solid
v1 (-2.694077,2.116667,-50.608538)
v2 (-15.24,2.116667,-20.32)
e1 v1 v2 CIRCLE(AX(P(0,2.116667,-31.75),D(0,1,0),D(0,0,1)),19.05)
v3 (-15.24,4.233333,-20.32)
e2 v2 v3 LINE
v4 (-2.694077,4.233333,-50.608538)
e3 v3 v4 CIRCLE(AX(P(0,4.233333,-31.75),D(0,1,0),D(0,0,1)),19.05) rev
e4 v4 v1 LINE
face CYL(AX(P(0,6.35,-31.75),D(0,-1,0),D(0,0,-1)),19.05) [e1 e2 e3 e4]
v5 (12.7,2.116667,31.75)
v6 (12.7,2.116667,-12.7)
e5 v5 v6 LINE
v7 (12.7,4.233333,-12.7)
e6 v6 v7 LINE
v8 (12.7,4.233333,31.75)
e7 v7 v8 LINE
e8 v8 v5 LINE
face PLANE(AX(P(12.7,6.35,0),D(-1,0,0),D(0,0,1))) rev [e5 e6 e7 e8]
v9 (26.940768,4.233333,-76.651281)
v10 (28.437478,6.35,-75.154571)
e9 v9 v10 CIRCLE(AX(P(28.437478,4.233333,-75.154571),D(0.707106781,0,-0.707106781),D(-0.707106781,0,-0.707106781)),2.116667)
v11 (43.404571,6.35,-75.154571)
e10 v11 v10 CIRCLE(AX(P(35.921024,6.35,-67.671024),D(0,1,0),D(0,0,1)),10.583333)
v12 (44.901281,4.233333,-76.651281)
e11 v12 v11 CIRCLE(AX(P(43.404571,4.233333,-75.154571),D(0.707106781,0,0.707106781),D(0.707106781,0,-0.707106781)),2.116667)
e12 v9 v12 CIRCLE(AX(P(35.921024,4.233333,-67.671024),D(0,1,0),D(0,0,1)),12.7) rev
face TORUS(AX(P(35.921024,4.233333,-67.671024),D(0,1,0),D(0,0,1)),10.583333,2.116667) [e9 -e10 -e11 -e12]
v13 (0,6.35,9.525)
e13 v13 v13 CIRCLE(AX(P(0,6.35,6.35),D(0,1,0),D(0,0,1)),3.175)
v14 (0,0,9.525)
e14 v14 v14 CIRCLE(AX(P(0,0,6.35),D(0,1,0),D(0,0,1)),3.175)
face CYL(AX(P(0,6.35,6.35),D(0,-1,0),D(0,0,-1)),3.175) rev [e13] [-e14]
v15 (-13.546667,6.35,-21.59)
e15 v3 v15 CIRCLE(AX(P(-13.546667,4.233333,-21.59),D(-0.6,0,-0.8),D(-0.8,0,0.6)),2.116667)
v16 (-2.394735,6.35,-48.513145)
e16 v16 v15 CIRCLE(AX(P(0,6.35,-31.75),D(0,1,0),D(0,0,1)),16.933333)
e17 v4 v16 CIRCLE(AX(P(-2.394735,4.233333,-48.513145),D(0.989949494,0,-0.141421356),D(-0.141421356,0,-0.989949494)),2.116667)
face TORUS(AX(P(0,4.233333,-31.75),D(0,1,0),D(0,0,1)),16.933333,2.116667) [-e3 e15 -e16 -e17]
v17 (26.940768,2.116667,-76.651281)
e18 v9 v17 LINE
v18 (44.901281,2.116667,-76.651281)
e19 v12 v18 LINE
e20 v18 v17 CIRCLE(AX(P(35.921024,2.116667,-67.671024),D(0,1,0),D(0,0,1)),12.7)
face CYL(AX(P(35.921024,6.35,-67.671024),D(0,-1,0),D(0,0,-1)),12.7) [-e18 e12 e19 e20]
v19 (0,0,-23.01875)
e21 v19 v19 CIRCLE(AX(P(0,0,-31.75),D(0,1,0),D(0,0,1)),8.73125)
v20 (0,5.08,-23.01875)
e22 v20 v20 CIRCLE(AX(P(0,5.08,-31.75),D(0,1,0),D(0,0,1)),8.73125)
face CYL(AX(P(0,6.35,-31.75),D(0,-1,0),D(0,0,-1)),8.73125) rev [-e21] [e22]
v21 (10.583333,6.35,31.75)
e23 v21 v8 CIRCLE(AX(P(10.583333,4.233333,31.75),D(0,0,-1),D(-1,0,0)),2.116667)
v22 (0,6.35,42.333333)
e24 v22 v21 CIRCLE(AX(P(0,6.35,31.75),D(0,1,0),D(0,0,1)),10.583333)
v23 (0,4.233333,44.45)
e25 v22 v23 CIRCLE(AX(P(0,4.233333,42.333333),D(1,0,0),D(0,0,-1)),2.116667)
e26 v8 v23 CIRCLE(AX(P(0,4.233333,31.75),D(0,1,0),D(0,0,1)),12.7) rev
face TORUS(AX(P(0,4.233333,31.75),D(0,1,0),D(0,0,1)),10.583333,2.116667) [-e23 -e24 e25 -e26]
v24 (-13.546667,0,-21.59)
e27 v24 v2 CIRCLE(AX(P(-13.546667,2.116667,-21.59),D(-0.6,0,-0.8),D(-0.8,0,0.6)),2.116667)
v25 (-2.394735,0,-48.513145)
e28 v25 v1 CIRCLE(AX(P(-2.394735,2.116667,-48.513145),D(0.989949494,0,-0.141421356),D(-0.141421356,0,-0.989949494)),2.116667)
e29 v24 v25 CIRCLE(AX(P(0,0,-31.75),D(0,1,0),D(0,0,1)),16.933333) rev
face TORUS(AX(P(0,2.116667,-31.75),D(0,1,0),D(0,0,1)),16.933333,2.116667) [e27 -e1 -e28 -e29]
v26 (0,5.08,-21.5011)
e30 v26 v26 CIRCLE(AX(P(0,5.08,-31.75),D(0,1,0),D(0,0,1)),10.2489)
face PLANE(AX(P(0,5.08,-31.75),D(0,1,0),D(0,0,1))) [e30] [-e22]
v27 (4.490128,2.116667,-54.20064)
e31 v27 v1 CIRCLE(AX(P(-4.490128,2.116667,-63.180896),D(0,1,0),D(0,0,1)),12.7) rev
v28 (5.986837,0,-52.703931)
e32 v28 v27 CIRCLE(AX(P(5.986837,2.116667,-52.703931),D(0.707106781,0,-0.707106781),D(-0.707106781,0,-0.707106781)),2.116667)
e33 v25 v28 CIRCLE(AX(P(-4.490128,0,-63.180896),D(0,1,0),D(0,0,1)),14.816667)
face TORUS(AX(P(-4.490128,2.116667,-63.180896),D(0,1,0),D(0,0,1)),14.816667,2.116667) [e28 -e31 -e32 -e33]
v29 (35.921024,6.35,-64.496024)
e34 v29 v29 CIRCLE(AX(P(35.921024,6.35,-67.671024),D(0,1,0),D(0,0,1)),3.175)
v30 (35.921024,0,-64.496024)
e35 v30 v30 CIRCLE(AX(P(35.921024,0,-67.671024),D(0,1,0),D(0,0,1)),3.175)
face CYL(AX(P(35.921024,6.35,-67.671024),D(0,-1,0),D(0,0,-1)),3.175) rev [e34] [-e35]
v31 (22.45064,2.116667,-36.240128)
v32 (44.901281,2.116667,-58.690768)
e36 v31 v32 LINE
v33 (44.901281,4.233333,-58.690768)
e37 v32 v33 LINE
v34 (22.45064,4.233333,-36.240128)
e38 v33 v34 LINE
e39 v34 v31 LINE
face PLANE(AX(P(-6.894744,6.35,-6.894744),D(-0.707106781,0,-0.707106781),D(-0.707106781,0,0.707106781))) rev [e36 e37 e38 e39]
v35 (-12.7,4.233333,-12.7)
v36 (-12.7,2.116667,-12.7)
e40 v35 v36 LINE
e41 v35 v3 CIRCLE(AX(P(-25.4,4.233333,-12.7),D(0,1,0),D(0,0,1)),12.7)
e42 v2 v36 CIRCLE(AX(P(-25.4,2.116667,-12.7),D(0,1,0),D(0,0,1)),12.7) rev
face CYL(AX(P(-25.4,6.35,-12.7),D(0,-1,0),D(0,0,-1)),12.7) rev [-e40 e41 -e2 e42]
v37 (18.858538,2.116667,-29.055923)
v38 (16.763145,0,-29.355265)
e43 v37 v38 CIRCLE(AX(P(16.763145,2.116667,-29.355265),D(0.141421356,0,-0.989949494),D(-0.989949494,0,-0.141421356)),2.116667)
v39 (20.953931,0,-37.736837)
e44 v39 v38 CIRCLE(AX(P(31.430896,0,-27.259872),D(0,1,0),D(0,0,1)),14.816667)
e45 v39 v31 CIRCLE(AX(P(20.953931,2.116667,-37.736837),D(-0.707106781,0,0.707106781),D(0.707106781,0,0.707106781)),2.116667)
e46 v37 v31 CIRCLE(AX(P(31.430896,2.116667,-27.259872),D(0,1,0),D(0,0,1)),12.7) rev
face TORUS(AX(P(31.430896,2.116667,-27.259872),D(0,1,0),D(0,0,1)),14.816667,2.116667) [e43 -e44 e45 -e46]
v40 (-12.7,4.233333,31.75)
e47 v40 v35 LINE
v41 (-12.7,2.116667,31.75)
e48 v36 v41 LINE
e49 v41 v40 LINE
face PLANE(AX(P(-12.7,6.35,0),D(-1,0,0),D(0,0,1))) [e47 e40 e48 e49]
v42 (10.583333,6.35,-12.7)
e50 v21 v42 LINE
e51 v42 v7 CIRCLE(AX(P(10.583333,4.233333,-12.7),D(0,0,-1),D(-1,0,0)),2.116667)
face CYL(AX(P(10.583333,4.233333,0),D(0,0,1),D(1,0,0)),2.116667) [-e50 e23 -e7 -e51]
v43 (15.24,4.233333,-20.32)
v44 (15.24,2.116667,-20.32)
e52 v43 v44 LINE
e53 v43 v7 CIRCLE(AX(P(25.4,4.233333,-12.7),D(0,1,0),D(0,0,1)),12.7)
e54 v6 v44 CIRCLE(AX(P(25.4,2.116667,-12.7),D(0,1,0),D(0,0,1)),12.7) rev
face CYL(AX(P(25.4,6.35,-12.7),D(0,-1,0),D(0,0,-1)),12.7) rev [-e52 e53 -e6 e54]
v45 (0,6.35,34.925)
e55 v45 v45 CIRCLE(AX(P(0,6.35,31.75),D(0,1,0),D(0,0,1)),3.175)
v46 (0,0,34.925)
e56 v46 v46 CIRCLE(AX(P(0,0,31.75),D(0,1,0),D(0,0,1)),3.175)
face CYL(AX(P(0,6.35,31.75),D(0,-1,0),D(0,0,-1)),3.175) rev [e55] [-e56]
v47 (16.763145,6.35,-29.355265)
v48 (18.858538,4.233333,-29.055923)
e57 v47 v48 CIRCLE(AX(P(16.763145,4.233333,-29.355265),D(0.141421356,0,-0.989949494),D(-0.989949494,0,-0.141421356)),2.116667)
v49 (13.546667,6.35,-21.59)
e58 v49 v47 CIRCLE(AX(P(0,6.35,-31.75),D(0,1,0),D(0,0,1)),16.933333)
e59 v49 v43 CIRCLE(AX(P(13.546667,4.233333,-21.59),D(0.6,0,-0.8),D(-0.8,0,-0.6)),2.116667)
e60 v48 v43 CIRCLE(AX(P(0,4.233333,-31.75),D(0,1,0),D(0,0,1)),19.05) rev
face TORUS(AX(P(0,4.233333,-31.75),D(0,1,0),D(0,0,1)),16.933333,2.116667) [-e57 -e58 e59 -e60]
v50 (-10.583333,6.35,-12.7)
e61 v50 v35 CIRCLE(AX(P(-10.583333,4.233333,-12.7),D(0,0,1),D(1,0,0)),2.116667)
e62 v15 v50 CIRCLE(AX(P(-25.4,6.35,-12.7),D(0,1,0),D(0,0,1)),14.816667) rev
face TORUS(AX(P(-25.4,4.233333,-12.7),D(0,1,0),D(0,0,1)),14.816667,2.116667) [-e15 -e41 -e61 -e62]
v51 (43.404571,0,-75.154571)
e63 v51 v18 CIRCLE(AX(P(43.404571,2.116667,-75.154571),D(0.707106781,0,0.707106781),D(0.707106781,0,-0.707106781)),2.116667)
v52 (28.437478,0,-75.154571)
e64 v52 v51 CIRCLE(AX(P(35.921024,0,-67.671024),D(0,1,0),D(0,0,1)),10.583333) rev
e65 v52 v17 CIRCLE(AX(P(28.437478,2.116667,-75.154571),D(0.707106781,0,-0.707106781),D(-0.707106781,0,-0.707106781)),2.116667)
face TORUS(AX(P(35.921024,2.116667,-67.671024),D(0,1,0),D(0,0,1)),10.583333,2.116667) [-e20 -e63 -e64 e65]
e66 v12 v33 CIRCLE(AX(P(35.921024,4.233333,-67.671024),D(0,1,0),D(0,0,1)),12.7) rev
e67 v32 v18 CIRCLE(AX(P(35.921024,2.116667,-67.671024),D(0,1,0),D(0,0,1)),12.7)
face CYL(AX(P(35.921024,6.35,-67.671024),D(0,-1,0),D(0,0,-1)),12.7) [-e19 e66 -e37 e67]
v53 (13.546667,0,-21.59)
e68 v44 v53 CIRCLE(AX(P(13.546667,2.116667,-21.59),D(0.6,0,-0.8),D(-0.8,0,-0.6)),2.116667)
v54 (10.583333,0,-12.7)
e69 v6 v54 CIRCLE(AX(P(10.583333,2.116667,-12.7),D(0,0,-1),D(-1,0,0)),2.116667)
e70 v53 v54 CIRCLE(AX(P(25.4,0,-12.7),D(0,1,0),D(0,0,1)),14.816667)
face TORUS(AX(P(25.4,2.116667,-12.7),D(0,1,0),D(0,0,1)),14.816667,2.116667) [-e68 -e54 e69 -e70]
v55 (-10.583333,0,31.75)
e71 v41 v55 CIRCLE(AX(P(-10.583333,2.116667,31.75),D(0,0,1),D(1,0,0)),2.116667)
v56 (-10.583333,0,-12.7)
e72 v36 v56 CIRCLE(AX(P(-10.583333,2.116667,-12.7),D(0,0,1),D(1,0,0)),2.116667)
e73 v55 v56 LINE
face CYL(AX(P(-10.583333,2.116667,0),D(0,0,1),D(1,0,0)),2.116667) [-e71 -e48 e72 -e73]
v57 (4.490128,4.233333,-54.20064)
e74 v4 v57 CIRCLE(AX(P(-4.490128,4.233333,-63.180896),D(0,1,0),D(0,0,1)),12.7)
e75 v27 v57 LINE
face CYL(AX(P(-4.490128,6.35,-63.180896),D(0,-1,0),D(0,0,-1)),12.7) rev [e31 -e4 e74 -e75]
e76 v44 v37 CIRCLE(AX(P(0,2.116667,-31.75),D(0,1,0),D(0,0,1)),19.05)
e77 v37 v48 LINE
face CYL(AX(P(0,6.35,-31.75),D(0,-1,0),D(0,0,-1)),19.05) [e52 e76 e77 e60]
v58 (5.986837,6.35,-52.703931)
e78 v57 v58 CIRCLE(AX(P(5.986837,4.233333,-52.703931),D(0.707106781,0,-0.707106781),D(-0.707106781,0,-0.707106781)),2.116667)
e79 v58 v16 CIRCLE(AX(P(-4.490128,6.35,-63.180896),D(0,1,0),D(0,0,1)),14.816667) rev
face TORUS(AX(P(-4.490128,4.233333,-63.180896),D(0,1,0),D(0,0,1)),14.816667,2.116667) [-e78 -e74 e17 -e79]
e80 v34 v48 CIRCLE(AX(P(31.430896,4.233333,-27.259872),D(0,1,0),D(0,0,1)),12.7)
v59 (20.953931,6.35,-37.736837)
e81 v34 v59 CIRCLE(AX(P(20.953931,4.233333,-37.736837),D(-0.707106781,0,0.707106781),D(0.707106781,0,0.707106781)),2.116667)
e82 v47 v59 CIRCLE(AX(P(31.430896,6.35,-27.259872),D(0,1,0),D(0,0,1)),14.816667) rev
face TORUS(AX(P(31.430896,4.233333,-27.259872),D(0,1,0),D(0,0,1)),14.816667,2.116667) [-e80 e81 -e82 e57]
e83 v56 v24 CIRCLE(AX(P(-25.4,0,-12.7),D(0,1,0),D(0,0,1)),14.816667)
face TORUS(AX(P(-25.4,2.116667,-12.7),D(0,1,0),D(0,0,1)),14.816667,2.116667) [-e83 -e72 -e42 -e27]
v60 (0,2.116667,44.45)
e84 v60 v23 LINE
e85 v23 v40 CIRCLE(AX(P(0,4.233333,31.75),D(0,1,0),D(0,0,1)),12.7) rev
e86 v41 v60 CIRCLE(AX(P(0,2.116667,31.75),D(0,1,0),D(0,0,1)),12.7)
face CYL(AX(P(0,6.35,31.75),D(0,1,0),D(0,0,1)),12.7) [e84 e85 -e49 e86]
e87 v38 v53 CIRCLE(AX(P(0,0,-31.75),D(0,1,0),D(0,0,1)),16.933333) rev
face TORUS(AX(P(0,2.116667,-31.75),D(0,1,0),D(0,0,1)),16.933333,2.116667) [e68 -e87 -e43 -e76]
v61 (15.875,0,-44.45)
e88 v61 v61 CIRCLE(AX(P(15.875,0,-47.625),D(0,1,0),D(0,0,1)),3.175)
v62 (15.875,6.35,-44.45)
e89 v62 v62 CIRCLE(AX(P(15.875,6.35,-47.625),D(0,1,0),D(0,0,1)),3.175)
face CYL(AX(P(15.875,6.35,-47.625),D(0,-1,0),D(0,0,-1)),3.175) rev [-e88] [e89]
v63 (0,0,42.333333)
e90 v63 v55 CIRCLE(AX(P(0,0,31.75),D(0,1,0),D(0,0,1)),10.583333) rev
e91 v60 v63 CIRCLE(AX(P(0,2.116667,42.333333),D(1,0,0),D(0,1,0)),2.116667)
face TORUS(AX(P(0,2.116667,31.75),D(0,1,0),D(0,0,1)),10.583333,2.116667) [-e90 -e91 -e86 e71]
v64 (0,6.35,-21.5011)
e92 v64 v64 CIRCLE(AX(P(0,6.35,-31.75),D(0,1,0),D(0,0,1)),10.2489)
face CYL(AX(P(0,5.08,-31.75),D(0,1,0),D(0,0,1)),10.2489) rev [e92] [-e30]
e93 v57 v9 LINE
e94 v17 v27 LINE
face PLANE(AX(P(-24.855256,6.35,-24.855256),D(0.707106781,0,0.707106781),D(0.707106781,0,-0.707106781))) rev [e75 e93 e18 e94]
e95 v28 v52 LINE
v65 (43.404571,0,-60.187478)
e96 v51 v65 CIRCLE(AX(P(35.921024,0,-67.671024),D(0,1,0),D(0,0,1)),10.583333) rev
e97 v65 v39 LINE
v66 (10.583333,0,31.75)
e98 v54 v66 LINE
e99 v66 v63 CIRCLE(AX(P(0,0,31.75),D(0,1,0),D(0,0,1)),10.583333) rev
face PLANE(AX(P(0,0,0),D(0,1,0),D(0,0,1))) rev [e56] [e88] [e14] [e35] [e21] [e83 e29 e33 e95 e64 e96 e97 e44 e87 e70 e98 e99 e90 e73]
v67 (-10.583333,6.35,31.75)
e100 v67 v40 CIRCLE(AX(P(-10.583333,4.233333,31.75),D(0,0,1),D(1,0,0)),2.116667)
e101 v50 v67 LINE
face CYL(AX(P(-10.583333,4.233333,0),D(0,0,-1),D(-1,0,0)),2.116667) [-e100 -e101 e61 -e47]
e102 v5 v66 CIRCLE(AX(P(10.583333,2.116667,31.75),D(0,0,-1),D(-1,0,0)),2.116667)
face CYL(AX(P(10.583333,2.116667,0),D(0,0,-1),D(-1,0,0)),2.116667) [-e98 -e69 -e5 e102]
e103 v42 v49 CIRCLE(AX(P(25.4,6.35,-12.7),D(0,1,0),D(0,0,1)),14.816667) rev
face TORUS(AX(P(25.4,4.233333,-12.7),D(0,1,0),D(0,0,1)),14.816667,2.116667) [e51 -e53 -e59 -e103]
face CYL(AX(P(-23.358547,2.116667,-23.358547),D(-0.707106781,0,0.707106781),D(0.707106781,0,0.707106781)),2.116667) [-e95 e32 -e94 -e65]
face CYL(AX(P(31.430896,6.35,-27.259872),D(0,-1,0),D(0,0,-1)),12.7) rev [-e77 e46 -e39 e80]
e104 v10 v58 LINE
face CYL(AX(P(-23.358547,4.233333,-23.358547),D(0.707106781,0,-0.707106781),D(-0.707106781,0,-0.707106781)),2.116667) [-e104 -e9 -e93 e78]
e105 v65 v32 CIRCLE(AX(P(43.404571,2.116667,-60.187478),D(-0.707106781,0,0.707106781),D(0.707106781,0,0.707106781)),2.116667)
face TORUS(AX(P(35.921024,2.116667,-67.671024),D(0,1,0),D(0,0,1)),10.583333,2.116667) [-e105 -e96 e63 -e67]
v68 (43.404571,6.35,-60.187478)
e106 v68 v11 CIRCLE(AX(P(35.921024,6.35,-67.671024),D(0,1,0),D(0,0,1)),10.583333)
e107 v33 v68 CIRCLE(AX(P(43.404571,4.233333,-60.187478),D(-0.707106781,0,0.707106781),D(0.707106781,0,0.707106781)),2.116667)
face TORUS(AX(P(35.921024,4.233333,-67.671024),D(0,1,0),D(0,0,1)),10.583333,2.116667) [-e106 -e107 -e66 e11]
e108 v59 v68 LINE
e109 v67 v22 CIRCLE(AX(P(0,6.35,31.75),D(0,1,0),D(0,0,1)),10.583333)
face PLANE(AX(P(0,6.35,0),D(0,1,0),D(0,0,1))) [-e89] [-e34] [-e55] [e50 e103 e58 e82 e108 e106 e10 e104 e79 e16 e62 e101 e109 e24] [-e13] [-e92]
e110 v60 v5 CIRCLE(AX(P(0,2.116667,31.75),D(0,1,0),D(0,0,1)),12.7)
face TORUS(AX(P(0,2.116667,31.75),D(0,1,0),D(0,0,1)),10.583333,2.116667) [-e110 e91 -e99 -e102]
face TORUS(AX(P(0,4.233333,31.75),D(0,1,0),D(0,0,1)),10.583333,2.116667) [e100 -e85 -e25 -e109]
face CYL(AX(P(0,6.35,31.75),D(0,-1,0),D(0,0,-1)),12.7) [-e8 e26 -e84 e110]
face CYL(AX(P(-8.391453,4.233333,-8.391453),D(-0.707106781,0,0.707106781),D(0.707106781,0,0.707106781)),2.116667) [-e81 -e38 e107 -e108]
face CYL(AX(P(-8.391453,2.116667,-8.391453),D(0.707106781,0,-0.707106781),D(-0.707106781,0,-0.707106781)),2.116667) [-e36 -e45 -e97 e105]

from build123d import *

# Parameters (mm, degrees)
SKETCH1_R           = 3.175
SKETCH1_R_2         = 8.73125
BOSS_EXTRUDE1_DEPTH = 6.35
FILLET2_R           = 12.7
FILLET3_R           = 2.116666667
SKETCH2_R           = 10.2489
CUT_EXTRUDE1_DEPTH  = 1.27


with BuildPart() as part:
    # Sketch1 → Boss-Extrude1 (new body)
    with BuildSketch(Plane(origin=(0, 0, 0), x_dir=(1, 0, 0), z_dir=(0, 1, 0))):
        with BuildLine():
            Line((-12.7, 17.550968343), (-12.7, -44.45))
            Line((-12.7, -44.45), (12.7, -44.45))
            Line((12.7, -44.45), (12.7, 17.550968343))
            ThreePointArc((12.7, 17.550968343), (17.599905094, 24.459880613), (19.020487692, 32.80997545))
            Line((19.020487692, 32.80997545), (53.881536726, 67.671024484))
            Line((53.881536726, 67.671024484), (35.921024484, 85.631536726))
            Line((35.921024484, 85.631536726), (1.05997545, 50.770487692))
            ThreePointArc((1.05997545, 50.770487692), (-17.599905094, 39.040119387), (-12.7, 17.550968343))
        make_face()
        with Locations(Location((0, -31.75, 0), (0, 0, 270))):
            Circle(SKETCH1_R, mode=Mode.SUBTRACT)
        with Locations(Location((0, -6.35, 0), (0, 0, 270))):
            Circle(SKETCH1_R, mode=Mode.SUBTRACT)
        with Locations(Location((0, 31.75, 0), (0, 0, 270))):
            Circle(SKETCH1_R_2, mode=Mode.SUBTRACT)
        with Locations(Location((35.921024484, 67.671024484, 0), (0, 0, 270))):
            Circle(SKETCH1_R, mode=Mode.SUBTRACT)
        with Locations(Location((15.875, 47.625, 0), (0, 0, 270))):
            Circle(SKETCH1_R, mode=Mode.SUBTRACT)
    extrude(amount=BOSS_EXTRUDE1_DEPTH)

    # Fillet2
    fillet2_edges = [part.edges().sort_by_distance(p)[0] for p in [
        (35.921024484, 3.175, -85.631536726),
        (53.881536726, 3.175, -67.671024484),
        (-12.7, 3.175, 44.45),
        (12.7, 3.175, 44.45),
        (1.05997545, 3.175, -50.770487692),
        (-12.7, 3.175, -17.550968343),
        (12.7, 3.175, -17.550968343),
        (19.020487692, 3.175, -32.80997545),
    ]]
    fillet(fillet2_edges, radius=FILLET2_R - 0.0001)  # a hair under: the kernel refuses the full size

    # Fillet3
    fillet3_edges = [part.edges().sort_by_distance(p)[0] for p in [
        (17.599905094, 0, -24.459880613),
        (17.599905094, 6.35, -24.459880613),
        (12.7, 0, 9.525033333),
        (12.7, 6.35, 9.525033333),
        (33.675984024, 0, -47.465471782),
        (33.675984024, 6.35, -47.465471782),
        (-17.599905094, 0, -39.040119387),
        (-17.599905094, 6.35, -39.040119387),
        (15.715471782, 0, -65.425984024),
        (15.715471782, 6.35, -65.425984024),
        (-12.7, 0, 9.525033333),
        (-12.7, 6.35, 9.525033333),
        (8.98028541, 0, 40.73028541),
        (-8.98028541, 0, 40.73028541),
        (48.621065906, 0, -67.671024484),
        (35.921024484, 0, -80.371065906),
        (8.98028541, 6.35, 40.73028541),
        (-8.98028541, 6.35, 40.73028541),
        (48.621065906, 6.35, -67.671024484),
        (35.921024484, 6.35, -80.371065906),
        (13.351719091, 0, -16.716100664),
        (13.351719091, 6.35, -16.716100664),
        (20.071663278, 0, -32.939481059),
        (20.071663278, 6.35, -32.939481059),
        (1.189481059, 0, -51.821663278),
        (1.189481059, 6.35, -51.821663278),
        (-13.351719091, 0, -16.716100664),
        (-13.351719091, 6.35, -16.716100664),
    ]]
    fillet(fillet3_edges, radius=FILLET3_R)

    # Sketch2 → Cut-Extrude1 (cut)
    with BuildSketch(Plane(origin=(0, 6.35, 0), x_dir=(1, 0, 0), z_dir=(0, 1, 0))):
        with Locations(Location((0, 31.75, 0), (0, 0, 270))):
            Circle(SKETCH2_R)
    extrude(amount=-CUT_EXTRUDE1_DEPTH, mode=Mode.SUBTRACT)


solid = part.part
